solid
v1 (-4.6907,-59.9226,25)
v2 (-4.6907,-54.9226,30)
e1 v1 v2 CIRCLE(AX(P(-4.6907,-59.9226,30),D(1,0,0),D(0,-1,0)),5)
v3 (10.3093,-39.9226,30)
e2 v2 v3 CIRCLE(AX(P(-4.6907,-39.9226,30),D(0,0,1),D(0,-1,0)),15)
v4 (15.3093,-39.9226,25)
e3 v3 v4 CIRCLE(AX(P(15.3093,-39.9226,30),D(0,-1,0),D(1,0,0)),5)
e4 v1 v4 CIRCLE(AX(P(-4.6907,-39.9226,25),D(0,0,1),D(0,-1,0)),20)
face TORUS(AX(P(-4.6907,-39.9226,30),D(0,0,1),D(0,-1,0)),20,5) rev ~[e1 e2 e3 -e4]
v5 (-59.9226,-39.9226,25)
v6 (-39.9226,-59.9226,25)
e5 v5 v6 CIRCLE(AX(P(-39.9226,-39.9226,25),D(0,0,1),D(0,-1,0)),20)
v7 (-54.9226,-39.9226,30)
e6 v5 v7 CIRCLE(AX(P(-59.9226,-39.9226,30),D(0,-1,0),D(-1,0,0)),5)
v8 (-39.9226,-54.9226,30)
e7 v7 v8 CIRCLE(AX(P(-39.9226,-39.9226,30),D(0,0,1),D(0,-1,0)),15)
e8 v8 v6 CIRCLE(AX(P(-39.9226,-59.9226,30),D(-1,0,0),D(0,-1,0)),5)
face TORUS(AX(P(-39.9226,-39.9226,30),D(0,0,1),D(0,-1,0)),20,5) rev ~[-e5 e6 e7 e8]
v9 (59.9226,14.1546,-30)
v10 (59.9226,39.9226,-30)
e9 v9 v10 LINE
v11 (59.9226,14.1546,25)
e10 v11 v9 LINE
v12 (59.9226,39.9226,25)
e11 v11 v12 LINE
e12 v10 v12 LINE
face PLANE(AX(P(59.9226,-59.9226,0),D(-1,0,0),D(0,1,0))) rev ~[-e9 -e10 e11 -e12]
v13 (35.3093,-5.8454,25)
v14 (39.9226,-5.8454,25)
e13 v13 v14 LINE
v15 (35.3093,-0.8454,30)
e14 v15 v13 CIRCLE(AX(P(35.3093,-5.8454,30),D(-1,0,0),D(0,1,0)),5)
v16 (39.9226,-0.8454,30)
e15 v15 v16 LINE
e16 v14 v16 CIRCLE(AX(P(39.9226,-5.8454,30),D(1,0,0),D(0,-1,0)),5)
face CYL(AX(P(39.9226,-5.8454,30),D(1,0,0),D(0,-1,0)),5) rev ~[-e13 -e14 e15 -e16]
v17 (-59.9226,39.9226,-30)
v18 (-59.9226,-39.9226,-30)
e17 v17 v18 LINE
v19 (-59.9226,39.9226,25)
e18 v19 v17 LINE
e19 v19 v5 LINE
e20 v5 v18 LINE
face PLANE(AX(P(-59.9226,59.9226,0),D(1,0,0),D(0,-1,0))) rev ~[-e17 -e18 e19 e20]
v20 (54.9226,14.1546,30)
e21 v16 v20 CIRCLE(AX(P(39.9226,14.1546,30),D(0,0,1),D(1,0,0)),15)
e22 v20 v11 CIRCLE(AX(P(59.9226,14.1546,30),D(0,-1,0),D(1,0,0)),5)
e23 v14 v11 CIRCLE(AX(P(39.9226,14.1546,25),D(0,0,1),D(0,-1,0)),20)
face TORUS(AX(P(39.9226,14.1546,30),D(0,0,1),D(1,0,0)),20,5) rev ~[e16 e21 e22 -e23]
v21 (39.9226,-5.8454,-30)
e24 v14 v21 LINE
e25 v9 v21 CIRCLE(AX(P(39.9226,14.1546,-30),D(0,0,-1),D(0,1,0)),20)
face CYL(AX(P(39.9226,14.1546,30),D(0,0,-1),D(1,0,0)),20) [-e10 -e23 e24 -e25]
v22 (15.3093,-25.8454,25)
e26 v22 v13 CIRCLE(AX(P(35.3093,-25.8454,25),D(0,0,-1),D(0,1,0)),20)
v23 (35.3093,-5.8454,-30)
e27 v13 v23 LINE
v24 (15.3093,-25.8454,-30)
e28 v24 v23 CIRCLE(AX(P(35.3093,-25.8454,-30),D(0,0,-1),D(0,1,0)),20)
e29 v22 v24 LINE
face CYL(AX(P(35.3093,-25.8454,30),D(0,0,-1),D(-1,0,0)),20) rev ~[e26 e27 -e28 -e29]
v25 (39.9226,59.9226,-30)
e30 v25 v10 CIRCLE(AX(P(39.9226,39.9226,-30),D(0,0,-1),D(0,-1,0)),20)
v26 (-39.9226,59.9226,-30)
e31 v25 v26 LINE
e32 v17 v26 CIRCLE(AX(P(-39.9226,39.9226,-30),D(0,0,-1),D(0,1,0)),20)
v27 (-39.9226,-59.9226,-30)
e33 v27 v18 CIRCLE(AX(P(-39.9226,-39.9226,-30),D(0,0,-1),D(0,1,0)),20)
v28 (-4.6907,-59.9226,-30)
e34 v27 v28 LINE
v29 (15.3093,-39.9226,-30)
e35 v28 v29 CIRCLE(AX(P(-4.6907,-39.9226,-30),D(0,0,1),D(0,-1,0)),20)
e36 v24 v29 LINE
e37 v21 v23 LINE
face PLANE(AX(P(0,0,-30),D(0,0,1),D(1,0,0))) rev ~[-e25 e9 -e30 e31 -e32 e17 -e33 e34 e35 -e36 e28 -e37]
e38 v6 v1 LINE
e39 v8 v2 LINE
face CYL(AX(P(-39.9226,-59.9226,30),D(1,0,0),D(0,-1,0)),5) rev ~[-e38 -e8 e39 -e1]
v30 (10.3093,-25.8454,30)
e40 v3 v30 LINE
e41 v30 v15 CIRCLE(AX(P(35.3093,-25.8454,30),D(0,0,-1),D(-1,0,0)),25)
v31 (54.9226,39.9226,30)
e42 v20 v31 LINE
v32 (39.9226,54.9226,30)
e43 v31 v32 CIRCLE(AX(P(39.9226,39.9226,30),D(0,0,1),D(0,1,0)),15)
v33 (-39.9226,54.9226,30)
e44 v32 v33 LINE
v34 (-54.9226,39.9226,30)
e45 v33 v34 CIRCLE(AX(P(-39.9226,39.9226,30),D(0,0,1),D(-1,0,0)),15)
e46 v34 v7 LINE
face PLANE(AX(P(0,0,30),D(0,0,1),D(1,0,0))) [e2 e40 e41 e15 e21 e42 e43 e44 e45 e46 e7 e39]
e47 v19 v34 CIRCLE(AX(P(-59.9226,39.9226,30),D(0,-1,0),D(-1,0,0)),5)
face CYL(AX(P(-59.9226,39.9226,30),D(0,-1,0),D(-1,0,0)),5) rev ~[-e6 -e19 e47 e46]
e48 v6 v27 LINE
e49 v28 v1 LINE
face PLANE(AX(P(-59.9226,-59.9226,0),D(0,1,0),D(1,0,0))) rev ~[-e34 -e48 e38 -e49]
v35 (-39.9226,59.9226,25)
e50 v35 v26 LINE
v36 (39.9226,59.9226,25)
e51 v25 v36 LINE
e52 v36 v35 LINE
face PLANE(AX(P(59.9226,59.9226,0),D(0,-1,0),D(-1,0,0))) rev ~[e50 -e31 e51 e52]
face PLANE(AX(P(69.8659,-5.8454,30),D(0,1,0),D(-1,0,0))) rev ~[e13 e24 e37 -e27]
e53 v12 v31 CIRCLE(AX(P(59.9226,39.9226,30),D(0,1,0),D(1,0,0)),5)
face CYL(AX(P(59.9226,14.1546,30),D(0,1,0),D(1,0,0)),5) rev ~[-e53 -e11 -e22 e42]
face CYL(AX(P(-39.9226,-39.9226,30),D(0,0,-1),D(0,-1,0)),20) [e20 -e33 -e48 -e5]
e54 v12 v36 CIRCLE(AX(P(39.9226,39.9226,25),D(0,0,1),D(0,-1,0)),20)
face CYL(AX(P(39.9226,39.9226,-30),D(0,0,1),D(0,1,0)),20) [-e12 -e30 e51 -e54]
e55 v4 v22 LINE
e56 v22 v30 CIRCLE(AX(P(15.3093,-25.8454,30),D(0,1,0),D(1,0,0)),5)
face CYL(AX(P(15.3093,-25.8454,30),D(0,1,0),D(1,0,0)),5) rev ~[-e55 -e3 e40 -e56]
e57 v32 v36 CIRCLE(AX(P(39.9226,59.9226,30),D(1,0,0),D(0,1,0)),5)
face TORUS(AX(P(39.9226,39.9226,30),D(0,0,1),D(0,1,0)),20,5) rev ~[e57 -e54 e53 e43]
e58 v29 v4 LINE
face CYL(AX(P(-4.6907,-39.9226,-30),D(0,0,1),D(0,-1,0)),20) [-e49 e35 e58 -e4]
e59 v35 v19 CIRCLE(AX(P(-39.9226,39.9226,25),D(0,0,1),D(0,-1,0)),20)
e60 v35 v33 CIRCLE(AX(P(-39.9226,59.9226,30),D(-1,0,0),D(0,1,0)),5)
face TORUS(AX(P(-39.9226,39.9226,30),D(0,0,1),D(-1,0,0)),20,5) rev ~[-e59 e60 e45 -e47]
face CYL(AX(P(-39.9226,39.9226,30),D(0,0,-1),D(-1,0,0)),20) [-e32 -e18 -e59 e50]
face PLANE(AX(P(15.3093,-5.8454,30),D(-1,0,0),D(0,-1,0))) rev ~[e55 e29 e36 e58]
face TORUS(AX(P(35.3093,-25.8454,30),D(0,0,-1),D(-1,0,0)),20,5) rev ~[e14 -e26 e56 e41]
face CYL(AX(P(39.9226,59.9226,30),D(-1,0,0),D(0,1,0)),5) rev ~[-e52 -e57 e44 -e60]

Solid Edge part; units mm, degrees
sketch "Sketch1" plane through (0, 0, 0) normal (0, 0, 1) x (1, 0, 0)
  line L0 (-59.9226, -59.9226) -> (59.9226, -59.9226)
  line L1 (59.9226, -59.9226) -> (59.9226, 59.9226)
  line L2 (59.9226, 59.9226) -> (-59.9226, 59.9226)
  line L3 (-59.9226, 59.9226) -> (-59.9226, -59.9226)
extrude "Protrusion1" add sketch "Sketch1" along normal mid plane 60
sketch "Sketch2" plane through (0, 0, 30) normal (0, 0, 1) x (1, 0, 0)
  line L0 (69.8659, -5.8454) -> (15.3093, -5.8454)
  line L1 (15.3093, -5.8454) -> (15.3093, -68.7525)
extrude "Cutout1" cut sketch "Sketch2" against normal through all material side at (42.5876, -5.8954, 30)
fillet "Round_1" radius 20 6 edges at (-59.9226, -59.9226, 0) (-59.9226, 59.9226, 0) (15.3093, -5.8454, 0) (15.3093, -59.9226, 0) (59.9226, -5.8454, 0) (59.9226, 59.9226, 0)
sketch "Sketch3" plane through (15.3093, -39.9226, 30) normal (0, -1, 0) x (1, 0, 0)
  circle A0 centre (0, 0) radius 5
  dimension "D1" = 10
sketch3d "SweptCutout1 path"
  line L0 (-59.9226, 39.9226, 30) -> (-59.9226, -39.9226, 30)
  arc A1 (-39.9226, -59.9226, 30) -> (-59.9226, -39.9226, 30) centre (-39.9226, -39.9226, 30)
  line L2 (-39.9226, -59.9226, 30) -> (-4.6907, -59.9226, 30)
  arc A3 (-4.6907, -59.9226, 30) -> (15.3093, -39.9226, 30) centre (-4.6907, -39.9226, 30)
  line L4 (15.3093, -25.8454, 30) -> (15.3093, -39.9226, 30)
  arc A5 (15.3093, -25.8454, 30) -> (35.3093, -5.8454, 30) centre (35.3093, -25.8454, 30)
  line L6 (39.9226, -5.8454, 30) -> (35.3093, -5.8454, 30)
  arc A7 (59.9226, 14.1546, 30) -> (39.9226, -5.8454, 30) centre (39.9226, 14.1546, 30)
  line L8 (59.9226, 14.1546, 30) -> (59.9226, 39.9226, 30)
  arc A9 (39.9226, 59.9226, 30) -> (59.9226, 39.9226, 30) centre (39.9226, 39.9226, 30)
  line L10 (39.9226, 59.9226, 30) -> (-39.9226, 59.9226, 30)
  arc A11 (-59.9226, 39.9226, 30) -> (-39.9226, 59.9226, 30) centre (-39.9226, 39.9226, 30)
sweep "SweptCutout1" cut profiles "Sketch3" path "SweptCutout1 path"
